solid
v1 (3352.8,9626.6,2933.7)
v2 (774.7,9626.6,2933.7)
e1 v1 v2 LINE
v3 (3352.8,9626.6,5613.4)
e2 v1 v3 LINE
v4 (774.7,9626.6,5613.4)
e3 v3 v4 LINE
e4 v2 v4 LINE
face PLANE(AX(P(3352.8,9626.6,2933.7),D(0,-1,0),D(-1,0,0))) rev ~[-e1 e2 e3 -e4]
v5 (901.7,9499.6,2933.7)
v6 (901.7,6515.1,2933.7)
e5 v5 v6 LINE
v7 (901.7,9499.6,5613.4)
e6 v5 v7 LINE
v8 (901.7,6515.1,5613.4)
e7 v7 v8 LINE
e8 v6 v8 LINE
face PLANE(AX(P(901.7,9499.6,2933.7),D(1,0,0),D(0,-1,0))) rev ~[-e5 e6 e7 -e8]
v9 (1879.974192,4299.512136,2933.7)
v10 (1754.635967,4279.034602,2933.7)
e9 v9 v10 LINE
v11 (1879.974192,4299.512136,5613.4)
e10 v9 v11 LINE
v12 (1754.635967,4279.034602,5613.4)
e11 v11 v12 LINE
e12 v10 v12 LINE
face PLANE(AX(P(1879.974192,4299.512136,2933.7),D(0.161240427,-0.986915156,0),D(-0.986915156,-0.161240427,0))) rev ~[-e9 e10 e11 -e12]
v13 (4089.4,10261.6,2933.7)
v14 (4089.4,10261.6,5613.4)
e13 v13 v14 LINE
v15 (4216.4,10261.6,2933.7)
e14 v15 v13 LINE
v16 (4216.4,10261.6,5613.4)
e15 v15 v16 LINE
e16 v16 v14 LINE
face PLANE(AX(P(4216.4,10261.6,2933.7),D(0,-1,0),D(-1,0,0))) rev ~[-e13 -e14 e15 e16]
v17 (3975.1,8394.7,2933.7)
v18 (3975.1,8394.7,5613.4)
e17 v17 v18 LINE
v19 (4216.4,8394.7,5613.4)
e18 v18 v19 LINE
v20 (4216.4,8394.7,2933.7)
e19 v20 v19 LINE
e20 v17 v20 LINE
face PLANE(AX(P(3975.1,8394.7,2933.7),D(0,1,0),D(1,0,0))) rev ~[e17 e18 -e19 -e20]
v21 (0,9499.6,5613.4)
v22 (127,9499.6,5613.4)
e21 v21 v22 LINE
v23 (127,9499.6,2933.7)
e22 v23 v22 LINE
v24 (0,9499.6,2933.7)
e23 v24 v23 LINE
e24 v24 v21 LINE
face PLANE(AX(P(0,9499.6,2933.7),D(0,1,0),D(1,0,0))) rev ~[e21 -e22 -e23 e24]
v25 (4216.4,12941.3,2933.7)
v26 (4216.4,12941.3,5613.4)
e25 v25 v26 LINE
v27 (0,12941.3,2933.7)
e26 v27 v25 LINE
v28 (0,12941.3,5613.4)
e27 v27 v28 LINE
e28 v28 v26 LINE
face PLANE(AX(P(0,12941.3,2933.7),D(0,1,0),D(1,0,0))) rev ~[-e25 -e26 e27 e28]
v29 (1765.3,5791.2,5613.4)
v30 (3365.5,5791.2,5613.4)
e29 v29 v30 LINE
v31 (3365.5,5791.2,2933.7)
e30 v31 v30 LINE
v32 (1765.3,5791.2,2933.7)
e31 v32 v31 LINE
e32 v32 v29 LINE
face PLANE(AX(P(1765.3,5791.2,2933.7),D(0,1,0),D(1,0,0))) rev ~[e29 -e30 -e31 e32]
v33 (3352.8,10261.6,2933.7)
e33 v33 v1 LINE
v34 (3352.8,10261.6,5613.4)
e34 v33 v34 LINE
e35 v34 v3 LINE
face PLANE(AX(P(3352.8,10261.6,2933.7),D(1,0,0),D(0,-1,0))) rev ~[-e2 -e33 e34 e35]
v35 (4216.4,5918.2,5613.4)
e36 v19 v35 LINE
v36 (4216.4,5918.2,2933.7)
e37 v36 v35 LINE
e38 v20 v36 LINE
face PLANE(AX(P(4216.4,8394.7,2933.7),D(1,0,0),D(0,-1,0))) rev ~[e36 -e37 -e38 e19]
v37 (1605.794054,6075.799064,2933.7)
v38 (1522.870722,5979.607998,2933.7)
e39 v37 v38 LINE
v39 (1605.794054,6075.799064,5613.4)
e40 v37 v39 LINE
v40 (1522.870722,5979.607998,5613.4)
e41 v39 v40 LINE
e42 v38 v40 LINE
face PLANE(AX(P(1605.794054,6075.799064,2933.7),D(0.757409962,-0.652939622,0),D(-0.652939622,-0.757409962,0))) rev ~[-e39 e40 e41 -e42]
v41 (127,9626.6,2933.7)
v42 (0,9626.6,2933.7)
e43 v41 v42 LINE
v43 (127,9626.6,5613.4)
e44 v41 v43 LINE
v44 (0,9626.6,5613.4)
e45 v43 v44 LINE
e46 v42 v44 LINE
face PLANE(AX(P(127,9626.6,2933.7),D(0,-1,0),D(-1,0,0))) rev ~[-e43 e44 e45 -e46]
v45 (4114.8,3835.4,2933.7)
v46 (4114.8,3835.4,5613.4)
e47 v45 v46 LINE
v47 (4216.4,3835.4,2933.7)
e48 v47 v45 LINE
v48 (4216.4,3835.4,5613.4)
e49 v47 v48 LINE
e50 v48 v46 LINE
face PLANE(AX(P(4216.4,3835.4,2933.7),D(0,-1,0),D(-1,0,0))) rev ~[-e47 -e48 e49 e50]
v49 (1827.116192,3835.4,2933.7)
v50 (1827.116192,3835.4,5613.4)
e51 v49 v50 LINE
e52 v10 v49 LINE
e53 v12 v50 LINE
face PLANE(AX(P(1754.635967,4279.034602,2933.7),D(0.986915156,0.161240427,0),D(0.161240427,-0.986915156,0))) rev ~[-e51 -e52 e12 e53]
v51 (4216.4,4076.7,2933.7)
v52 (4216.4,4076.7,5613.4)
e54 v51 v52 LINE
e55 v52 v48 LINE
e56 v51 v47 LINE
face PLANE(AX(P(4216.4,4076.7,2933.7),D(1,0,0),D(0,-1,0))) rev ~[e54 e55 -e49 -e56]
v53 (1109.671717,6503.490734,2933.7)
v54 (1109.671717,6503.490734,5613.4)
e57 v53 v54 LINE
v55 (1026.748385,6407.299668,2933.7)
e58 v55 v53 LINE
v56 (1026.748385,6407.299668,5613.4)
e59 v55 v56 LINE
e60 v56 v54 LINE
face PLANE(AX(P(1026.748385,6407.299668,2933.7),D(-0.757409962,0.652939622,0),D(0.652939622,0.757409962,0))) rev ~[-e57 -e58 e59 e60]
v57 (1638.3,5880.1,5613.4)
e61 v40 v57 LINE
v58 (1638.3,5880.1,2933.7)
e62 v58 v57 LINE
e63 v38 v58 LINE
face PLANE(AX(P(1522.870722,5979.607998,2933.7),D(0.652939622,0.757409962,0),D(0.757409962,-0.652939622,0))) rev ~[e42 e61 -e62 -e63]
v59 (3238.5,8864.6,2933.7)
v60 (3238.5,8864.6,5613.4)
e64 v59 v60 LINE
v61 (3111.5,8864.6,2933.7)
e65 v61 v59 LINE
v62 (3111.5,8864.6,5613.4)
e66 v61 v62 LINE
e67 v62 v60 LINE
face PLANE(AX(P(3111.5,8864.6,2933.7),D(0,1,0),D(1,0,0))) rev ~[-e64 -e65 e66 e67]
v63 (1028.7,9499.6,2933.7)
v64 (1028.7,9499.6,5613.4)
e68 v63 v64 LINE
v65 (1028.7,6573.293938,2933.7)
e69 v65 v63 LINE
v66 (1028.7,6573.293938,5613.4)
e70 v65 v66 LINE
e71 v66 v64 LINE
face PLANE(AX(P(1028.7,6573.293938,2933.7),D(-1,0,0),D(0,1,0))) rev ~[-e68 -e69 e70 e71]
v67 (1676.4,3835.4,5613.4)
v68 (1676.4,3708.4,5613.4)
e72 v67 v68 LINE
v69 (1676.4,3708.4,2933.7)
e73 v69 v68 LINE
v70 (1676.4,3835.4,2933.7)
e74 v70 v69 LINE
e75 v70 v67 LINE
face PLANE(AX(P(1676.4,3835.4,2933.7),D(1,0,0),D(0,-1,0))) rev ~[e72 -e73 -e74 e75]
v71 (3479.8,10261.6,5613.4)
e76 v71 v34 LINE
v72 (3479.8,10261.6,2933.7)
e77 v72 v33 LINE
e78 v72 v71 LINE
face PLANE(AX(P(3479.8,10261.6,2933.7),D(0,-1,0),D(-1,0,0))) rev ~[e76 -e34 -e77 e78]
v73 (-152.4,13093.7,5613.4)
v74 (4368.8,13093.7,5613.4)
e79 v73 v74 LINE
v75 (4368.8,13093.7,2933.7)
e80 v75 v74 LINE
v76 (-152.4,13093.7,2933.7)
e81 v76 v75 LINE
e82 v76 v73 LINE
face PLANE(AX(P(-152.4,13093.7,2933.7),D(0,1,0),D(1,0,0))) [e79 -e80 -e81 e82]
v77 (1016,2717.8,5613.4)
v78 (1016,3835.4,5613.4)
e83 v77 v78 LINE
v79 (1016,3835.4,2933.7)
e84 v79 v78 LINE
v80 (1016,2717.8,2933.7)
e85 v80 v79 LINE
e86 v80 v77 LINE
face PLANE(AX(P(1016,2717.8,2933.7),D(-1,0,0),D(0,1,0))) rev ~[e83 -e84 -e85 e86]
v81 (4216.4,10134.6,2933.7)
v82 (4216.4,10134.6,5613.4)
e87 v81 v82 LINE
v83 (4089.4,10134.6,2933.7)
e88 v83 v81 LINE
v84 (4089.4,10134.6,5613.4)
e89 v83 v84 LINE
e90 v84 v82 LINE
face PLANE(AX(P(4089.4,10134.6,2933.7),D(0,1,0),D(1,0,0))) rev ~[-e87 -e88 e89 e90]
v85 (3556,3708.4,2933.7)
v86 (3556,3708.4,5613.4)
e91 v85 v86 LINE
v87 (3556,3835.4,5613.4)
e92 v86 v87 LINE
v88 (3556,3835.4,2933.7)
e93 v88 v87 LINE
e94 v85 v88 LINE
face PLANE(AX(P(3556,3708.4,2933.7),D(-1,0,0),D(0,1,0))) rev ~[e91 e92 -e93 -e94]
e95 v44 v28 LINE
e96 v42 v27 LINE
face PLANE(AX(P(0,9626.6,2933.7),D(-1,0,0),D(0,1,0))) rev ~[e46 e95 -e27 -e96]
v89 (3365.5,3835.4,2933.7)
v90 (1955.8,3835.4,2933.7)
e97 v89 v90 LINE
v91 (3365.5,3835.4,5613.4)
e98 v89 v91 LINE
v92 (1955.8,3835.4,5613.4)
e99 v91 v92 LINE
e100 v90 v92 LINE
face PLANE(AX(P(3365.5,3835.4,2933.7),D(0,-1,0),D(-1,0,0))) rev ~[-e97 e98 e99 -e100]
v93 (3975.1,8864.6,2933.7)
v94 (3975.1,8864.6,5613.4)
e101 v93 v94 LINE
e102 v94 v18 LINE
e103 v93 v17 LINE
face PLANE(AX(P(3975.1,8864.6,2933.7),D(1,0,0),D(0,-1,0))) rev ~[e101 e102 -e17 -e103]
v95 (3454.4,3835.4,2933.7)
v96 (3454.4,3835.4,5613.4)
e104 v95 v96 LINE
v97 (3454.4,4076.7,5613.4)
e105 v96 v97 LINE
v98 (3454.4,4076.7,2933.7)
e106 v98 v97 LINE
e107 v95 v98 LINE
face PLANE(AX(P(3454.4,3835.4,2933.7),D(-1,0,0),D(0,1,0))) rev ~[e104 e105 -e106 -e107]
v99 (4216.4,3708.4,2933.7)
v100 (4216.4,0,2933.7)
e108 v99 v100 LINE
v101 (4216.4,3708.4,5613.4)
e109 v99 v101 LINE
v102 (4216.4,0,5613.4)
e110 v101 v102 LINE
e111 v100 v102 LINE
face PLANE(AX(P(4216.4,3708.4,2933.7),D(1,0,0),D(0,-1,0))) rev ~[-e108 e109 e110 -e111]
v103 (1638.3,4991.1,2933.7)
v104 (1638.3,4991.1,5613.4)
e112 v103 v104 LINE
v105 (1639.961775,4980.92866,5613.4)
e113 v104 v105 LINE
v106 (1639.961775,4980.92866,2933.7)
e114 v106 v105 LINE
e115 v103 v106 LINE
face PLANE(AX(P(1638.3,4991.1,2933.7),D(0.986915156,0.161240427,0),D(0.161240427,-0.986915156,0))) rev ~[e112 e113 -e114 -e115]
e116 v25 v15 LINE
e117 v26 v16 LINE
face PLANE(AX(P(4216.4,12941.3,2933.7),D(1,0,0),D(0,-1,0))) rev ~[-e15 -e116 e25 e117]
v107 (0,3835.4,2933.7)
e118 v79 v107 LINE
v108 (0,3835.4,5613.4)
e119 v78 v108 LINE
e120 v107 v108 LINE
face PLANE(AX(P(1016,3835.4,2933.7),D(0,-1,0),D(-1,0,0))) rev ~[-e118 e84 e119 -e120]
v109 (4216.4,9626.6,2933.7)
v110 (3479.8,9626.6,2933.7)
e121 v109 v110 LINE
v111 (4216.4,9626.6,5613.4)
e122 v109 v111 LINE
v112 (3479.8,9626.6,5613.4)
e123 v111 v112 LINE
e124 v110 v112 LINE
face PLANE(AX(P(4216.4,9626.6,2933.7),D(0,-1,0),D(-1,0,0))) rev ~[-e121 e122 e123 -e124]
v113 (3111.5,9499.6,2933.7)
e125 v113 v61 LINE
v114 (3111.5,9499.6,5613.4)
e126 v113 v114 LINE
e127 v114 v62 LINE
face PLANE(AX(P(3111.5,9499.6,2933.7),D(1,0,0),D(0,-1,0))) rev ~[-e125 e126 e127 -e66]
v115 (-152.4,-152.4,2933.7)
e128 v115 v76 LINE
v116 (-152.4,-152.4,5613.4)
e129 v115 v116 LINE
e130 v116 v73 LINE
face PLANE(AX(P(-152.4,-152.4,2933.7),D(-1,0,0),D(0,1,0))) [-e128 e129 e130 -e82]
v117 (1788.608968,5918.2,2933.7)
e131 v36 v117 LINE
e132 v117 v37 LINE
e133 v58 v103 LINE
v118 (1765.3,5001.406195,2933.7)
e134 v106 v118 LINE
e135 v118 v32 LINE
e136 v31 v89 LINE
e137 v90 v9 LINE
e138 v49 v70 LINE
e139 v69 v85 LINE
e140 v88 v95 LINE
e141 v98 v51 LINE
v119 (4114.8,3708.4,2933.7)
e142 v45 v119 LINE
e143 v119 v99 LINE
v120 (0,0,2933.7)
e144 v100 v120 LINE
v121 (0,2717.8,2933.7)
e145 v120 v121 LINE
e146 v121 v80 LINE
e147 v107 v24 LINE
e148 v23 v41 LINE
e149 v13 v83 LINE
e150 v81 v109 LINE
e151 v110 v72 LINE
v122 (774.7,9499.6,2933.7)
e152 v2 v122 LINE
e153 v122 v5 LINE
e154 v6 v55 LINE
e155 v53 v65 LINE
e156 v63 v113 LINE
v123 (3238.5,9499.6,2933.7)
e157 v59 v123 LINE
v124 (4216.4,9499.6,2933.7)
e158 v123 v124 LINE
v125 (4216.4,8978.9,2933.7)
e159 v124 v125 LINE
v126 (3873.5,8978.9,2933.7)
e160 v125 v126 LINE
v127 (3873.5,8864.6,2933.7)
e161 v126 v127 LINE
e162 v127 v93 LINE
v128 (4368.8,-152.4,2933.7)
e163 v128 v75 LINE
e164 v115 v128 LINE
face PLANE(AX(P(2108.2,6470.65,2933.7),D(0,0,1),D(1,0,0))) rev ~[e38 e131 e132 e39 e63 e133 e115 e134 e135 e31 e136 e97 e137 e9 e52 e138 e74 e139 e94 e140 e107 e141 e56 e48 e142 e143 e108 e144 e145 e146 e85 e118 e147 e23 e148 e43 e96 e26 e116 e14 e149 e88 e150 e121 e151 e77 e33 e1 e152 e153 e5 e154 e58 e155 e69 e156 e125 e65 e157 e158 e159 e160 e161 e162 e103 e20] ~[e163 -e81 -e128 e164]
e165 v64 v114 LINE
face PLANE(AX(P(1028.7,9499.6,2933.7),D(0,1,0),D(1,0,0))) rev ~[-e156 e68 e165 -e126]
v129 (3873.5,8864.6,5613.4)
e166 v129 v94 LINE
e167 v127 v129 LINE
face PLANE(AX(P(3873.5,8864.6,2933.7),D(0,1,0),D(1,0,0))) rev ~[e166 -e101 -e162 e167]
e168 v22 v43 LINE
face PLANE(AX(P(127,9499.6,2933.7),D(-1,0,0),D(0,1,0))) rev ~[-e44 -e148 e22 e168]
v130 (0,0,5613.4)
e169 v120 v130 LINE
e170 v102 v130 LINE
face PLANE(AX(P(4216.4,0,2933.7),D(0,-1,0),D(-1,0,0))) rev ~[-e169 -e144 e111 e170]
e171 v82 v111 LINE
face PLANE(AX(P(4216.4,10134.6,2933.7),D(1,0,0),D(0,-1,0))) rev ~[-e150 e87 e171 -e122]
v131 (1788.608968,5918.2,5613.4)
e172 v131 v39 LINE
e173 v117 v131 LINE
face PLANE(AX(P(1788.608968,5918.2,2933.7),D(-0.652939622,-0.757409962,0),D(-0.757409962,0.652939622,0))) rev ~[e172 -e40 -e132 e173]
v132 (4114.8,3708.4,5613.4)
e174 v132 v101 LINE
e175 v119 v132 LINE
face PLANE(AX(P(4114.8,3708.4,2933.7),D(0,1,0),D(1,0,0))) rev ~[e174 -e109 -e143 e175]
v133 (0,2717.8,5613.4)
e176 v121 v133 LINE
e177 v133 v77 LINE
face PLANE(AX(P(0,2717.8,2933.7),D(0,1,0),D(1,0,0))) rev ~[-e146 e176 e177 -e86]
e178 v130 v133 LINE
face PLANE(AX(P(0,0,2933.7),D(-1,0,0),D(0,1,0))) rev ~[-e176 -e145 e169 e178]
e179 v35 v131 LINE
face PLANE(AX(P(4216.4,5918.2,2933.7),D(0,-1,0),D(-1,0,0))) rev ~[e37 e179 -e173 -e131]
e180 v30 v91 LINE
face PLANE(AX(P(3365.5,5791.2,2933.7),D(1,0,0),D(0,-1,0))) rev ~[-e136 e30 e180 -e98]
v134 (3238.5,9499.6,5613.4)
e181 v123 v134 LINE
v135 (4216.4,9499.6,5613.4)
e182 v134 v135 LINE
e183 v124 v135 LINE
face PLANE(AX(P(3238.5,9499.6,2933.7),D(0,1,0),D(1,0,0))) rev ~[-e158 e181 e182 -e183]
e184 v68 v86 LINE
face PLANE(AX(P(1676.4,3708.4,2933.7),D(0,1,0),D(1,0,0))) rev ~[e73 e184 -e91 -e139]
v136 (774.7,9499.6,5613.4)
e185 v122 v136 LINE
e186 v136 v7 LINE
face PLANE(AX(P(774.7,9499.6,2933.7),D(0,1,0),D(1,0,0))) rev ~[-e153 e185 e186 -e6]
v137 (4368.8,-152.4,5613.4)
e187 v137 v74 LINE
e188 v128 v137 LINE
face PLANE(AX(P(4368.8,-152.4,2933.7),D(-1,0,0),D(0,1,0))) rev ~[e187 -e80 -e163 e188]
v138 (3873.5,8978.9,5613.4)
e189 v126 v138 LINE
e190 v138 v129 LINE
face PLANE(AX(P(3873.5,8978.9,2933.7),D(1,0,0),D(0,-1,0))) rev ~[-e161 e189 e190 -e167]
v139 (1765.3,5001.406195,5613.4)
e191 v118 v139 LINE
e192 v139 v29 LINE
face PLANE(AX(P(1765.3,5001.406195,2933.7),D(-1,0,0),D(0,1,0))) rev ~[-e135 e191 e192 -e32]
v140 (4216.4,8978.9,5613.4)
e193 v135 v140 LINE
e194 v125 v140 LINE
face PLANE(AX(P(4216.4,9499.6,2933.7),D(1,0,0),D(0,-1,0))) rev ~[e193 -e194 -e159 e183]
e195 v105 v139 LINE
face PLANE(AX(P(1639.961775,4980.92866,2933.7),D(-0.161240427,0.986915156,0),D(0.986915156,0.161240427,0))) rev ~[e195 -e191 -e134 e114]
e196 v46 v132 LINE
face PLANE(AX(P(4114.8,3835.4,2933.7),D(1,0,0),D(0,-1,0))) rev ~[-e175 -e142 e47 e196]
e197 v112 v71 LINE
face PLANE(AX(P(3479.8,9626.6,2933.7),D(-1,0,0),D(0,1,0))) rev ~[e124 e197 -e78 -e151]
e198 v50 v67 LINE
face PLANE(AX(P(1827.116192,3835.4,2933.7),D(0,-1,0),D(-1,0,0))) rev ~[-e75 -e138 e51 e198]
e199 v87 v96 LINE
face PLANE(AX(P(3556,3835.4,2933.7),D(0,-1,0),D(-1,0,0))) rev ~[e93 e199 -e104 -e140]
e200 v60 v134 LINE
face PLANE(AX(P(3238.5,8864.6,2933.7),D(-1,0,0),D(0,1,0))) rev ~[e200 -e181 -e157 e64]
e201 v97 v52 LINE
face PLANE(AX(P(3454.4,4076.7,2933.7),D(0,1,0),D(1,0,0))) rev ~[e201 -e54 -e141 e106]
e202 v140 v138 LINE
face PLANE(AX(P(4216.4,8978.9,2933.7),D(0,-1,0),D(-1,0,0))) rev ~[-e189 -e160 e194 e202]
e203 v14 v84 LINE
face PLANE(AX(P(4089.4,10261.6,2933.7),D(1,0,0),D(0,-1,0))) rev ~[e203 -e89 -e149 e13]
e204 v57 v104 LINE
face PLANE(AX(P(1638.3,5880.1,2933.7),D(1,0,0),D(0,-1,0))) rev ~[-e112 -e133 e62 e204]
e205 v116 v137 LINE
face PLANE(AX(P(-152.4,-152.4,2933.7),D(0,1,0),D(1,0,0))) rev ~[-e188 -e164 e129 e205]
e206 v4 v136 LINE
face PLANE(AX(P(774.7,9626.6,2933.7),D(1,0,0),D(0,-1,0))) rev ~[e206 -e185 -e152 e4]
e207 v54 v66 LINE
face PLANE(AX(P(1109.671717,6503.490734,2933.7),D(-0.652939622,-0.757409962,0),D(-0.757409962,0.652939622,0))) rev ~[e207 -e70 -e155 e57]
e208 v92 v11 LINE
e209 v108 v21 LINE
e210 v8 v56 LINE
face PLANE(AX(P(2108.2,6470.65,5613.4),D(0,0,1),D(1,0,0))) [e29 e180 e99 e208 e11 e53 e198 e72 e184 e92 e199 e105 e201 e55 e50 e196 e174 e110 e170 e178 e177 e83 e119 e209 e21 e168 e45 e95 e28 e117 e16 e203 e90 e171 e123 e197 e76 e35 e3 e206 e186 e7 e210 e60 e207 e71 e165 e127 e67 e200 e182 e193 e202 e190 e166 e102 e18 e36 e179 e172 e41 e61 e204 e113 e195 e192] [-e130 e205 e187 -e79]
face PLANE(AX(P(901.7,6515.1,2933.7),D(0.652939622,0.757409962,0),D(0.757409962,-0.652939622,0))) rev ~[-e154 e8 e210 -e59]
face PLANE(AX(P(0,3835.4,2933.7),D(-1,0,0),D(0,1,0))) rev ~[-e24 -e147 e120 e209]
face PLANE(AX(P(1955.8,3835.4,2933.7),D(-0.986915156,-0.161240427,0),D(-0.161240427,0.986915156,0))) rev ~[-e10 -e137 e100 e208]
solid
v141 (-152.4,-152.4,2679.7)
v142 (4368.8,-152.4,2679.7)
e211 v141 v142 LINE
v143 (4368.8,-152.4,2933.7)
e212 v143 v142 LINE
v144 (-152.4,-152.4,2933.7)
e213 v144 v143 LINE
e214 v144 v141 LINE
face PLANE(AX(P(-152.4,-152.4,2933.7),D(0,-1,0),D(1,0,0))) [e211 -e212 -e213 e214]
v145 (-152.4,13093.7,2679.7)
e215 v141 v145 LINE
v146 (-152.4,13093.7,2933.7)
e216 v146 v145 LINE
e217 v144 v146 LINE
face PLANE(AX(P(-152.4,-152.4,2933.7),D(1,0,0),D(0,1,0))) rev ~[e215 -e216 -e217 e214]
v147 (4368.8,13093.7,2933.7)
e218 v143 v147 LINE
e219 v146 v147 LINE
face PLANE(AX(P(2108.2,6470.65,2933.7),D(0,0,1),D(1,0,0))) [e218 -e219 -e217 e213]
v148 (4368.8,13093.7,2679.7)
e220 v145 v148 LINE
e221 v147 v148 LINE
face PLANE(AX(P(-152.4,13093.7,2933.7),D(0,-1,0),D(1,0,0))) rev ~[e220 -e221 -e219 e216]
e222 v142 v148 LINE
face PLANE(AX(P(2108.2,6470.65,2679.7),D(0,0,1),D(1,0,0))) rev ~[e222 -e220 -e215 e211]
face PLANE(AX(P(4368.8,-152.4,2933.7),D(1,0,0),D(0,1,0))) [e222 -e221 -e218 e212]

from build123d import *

# Parameters (mm, degrees)
F1_W     = 4521.2
F1_H     = 13246.1
F2_DEPTH = 254
F3_DEPTH = 2679.7


# Not quite as in the source:
# - a feature names something its author has since deleted; it is built from what else it names


with BuildPart() as f2:
    # F1 (on offset) → F2 (new body)
    with BuildSketch(Plane.XY.offset(2933.7)):
        with Locations((2108.2, 6470.65)):
            Rectangle(F1_W, F1_H)
        Polygon((4216.4, 0), (0, 0), (0, 2717.8), (1016, 2717.8), (1016, 3835.4), (0, 3835.4), (0, 9499.6), (127, 9499.6), (127, 9626.6), (0, 9626.6), (0, 12941.3), (4216.4, 12941.3), (4216.4, 10261.6), (4089.4, 10261.6), (4089.4, 10134.6), (4216.4, 10134.6), (4216.4, 9626.6), (3479.8, 9626.6), (3479.8, 10261.6), (3352.8, 10261.6), (3352.8, 9626.6), (774.7, 9626.6), (774.7, 9499.6), (901.7, 9499.6), (901.7, 6515.1), (1026.7483846603, 6407.2996683963), (1109.6717166631, 6503.4907335196), (1028.7, 6573.2939375395), (1028.7, 9499.6), (3111.5, 9499.6), (3111.5, 8864.6), (3238.5, 8864.6), (3238.5, 9499.6), (4216.4, 9499.6), (4216.4, 8978.9), (3873.5, 8978.9), (3873.5, 8864.6), (3975.1, 8864.6), (3975.1, 8394.7), (4216.4, 8394.7), (4216.4, 5918.2), (1788.6089675458, 5918.2), (1605.7940538549, 6075.7990635267), (1522.8707218521, 5979.6079984034), (1638.3, 5880.1), (1638.3, 4991.1), (1639.9617752246, 4980.9286603364), (1765.3, 5001.4061946153), (1765.3, 5791.2), (3365.5, 5791.2), (3365.5, 3835.4), (1955.8, 3835.4), (1879.9741919622, 4299.512135873), (1754.6359671868, 4279.034601594), (1827.1161924154, 3835.4), (1676.4, 3835.4), (1676.4, 3708.4), (3556, 3708.4), (3556, 3835.4), (3454.4, 3835.4), (3454.4, 4076.7), (4216.4, 4076.7), (4216.4, 3835.4), (4114.8, 3835.4), (4114.8, 3708.4), (4216.4, 3708.4), align=None, mode=Mode.SUBTRACT)
        Polygon((0, 2717.8), (0, 0), (4216.4, 0), (4216.4, 3708.4), (4114.8, 3708.4), (4114.8, 3835.4), (4216.4, 3835.4), (4216.4, 4076.7), (3454.4, 4076.7), (3454.4, 3835.4), (3556, 3835.4), (3556, 3708.4), (1676.4, 3708.4), (1676.4, 3835.4), (1827.1161924154, 3835.4), (1754.6359671868, 4279.034601594), (1879.9741919622, 4299.512135873), (1955.8, 3835.4), (3365.5, 3835.4), (3365.5, 5791.2), (1765.3, 5791.2), (1765.3, 5001.4061946153), (1639.9617752246, 4980.9286603364), (1638.3, 4991.1), (1638.3, 5880.1), (1522.8707218521, 5979.6079984034), (1605.7940538549, 6075.7990635267), (1788.6089675458, 5918.2), (4216.4, 5918.2), (4216.4, 8394.7), (3975.1, 8394.7), (3975.1, 8864.6), (3873.5, 8864.6), (3873.5, 8978.9), (4216.4, 8978.9), (4216.4, 9499.6), (3238.5, 9499.6), (3238.5, 8864.6), (3111.5, 8864.6), (3111.5, 9499.6), (1028.7, 9499.6), (1028.7, 6573.2939375395), (1109.6717166631, 6503.4907335196), (1026.7483846603, 6407.2996683963), (901.7, 6515.1), (901.7, 9499.6), (774.7, 9499.6), (774.7, 9626.6), (3352.8, 9626.6), (3352.8, 10261.6), (3479.8, 10261.6), (3479.8, 9626.6), (4216.4, 9626.6), (4216.4, 10134.6), (4089.4, 10134.6), (4089.4, 10261.6), (4216.4, 10261.6), (4216.4, 12941.3), (0, 12941.3), (0, 9626.6), (127, 9626.6), (127, 9499.6), (0, 9499.6), (0, 3835.4), (1016, 3835.4), (1016, 2717.8), align=None)
    extrude(amount=-F2_DEPTH)


with BuildPart() as f3:
    # F1 (on offset) → F3 (new body)
    with BuildSketch(Plane.XY.offset(2933.7)):
        with Locations((2108.2, 6470.65)):
            Rectangle(F1_W, F1_H)
        Polygon((4216.4, 0), (0, 0), (0, 2717.8), (1016, 2717.8), (1016, 3835.4), (0, 3835.4), (0, 9499.6), (127, 9499.6), (127, 9626.6), (0, 9626.6), (0, 12941.3), (4216.4, 12941.3), (4216.4, 10261.6), (4089.4, 10261.6), (4089.4, 10134.6), (4216.4, 10134.6), (4216.4, 9626.6), (3479.8, 9626.6), (3479.8, 10261.6), (3352.8, 10261.6), (3352.8, 9626.6), (774.7, 9626.6), (774.7, 9499.6), (901.7, 9499.6), (901.7, 6515.1), (1026.7483846603, 6407.2996683963), (1109.6717166631, 6503.4907335196), (1028.7, 6573.2939375395), (1028.7, 9499.6), (3111.5, 9499.6), (3111.5, 8864.6), (3238.5, 8864.6), (3238.5, 9499.6), (4216.4, 9499.6), (4216.4, 8978.9), (3873.5, 8978.9), (3873.5, 8864.6), (3975.1, 8864.6), (3975.1, 8394.7), (4216.4, 8394.7), (4216.4, 5918.2), (1788.6089675458, 5918.2), (1605.7940538549, 6075.7990635267), (1522.8707218521, 5979.6079984034), (1638.3, 5880.1), (1638.3, 4991.1), (1639.9617752246, 4980.9286603364), (1765.3, 5001.4061946153), (1765.3, 5791.2), (3365.5, 5791.2), (3365.5, 3835.4), (1955.8, 3835.4), (1879.9741919622, 4299.512135873), (1754.6359671868, 4279.034601594), (1827.1161924154, 3835.4), (1676.4, 3835.4), (1676.4, 3708.4), (3556, 3708.4), (3556, 3835.4), (3454.4, 3835.4), (3454.4, 4076.7), (4216.4, 4076.7), (4216.4, 3835.4), (4114.8, 3835.4), (4114.8, 3708.4), (4216.4, 3708.4), align=None, mode=Mode.SUBTRACT)
    extrude(amount=F3_DEPTH)


solid = Compound([f2.part, f3.part])
